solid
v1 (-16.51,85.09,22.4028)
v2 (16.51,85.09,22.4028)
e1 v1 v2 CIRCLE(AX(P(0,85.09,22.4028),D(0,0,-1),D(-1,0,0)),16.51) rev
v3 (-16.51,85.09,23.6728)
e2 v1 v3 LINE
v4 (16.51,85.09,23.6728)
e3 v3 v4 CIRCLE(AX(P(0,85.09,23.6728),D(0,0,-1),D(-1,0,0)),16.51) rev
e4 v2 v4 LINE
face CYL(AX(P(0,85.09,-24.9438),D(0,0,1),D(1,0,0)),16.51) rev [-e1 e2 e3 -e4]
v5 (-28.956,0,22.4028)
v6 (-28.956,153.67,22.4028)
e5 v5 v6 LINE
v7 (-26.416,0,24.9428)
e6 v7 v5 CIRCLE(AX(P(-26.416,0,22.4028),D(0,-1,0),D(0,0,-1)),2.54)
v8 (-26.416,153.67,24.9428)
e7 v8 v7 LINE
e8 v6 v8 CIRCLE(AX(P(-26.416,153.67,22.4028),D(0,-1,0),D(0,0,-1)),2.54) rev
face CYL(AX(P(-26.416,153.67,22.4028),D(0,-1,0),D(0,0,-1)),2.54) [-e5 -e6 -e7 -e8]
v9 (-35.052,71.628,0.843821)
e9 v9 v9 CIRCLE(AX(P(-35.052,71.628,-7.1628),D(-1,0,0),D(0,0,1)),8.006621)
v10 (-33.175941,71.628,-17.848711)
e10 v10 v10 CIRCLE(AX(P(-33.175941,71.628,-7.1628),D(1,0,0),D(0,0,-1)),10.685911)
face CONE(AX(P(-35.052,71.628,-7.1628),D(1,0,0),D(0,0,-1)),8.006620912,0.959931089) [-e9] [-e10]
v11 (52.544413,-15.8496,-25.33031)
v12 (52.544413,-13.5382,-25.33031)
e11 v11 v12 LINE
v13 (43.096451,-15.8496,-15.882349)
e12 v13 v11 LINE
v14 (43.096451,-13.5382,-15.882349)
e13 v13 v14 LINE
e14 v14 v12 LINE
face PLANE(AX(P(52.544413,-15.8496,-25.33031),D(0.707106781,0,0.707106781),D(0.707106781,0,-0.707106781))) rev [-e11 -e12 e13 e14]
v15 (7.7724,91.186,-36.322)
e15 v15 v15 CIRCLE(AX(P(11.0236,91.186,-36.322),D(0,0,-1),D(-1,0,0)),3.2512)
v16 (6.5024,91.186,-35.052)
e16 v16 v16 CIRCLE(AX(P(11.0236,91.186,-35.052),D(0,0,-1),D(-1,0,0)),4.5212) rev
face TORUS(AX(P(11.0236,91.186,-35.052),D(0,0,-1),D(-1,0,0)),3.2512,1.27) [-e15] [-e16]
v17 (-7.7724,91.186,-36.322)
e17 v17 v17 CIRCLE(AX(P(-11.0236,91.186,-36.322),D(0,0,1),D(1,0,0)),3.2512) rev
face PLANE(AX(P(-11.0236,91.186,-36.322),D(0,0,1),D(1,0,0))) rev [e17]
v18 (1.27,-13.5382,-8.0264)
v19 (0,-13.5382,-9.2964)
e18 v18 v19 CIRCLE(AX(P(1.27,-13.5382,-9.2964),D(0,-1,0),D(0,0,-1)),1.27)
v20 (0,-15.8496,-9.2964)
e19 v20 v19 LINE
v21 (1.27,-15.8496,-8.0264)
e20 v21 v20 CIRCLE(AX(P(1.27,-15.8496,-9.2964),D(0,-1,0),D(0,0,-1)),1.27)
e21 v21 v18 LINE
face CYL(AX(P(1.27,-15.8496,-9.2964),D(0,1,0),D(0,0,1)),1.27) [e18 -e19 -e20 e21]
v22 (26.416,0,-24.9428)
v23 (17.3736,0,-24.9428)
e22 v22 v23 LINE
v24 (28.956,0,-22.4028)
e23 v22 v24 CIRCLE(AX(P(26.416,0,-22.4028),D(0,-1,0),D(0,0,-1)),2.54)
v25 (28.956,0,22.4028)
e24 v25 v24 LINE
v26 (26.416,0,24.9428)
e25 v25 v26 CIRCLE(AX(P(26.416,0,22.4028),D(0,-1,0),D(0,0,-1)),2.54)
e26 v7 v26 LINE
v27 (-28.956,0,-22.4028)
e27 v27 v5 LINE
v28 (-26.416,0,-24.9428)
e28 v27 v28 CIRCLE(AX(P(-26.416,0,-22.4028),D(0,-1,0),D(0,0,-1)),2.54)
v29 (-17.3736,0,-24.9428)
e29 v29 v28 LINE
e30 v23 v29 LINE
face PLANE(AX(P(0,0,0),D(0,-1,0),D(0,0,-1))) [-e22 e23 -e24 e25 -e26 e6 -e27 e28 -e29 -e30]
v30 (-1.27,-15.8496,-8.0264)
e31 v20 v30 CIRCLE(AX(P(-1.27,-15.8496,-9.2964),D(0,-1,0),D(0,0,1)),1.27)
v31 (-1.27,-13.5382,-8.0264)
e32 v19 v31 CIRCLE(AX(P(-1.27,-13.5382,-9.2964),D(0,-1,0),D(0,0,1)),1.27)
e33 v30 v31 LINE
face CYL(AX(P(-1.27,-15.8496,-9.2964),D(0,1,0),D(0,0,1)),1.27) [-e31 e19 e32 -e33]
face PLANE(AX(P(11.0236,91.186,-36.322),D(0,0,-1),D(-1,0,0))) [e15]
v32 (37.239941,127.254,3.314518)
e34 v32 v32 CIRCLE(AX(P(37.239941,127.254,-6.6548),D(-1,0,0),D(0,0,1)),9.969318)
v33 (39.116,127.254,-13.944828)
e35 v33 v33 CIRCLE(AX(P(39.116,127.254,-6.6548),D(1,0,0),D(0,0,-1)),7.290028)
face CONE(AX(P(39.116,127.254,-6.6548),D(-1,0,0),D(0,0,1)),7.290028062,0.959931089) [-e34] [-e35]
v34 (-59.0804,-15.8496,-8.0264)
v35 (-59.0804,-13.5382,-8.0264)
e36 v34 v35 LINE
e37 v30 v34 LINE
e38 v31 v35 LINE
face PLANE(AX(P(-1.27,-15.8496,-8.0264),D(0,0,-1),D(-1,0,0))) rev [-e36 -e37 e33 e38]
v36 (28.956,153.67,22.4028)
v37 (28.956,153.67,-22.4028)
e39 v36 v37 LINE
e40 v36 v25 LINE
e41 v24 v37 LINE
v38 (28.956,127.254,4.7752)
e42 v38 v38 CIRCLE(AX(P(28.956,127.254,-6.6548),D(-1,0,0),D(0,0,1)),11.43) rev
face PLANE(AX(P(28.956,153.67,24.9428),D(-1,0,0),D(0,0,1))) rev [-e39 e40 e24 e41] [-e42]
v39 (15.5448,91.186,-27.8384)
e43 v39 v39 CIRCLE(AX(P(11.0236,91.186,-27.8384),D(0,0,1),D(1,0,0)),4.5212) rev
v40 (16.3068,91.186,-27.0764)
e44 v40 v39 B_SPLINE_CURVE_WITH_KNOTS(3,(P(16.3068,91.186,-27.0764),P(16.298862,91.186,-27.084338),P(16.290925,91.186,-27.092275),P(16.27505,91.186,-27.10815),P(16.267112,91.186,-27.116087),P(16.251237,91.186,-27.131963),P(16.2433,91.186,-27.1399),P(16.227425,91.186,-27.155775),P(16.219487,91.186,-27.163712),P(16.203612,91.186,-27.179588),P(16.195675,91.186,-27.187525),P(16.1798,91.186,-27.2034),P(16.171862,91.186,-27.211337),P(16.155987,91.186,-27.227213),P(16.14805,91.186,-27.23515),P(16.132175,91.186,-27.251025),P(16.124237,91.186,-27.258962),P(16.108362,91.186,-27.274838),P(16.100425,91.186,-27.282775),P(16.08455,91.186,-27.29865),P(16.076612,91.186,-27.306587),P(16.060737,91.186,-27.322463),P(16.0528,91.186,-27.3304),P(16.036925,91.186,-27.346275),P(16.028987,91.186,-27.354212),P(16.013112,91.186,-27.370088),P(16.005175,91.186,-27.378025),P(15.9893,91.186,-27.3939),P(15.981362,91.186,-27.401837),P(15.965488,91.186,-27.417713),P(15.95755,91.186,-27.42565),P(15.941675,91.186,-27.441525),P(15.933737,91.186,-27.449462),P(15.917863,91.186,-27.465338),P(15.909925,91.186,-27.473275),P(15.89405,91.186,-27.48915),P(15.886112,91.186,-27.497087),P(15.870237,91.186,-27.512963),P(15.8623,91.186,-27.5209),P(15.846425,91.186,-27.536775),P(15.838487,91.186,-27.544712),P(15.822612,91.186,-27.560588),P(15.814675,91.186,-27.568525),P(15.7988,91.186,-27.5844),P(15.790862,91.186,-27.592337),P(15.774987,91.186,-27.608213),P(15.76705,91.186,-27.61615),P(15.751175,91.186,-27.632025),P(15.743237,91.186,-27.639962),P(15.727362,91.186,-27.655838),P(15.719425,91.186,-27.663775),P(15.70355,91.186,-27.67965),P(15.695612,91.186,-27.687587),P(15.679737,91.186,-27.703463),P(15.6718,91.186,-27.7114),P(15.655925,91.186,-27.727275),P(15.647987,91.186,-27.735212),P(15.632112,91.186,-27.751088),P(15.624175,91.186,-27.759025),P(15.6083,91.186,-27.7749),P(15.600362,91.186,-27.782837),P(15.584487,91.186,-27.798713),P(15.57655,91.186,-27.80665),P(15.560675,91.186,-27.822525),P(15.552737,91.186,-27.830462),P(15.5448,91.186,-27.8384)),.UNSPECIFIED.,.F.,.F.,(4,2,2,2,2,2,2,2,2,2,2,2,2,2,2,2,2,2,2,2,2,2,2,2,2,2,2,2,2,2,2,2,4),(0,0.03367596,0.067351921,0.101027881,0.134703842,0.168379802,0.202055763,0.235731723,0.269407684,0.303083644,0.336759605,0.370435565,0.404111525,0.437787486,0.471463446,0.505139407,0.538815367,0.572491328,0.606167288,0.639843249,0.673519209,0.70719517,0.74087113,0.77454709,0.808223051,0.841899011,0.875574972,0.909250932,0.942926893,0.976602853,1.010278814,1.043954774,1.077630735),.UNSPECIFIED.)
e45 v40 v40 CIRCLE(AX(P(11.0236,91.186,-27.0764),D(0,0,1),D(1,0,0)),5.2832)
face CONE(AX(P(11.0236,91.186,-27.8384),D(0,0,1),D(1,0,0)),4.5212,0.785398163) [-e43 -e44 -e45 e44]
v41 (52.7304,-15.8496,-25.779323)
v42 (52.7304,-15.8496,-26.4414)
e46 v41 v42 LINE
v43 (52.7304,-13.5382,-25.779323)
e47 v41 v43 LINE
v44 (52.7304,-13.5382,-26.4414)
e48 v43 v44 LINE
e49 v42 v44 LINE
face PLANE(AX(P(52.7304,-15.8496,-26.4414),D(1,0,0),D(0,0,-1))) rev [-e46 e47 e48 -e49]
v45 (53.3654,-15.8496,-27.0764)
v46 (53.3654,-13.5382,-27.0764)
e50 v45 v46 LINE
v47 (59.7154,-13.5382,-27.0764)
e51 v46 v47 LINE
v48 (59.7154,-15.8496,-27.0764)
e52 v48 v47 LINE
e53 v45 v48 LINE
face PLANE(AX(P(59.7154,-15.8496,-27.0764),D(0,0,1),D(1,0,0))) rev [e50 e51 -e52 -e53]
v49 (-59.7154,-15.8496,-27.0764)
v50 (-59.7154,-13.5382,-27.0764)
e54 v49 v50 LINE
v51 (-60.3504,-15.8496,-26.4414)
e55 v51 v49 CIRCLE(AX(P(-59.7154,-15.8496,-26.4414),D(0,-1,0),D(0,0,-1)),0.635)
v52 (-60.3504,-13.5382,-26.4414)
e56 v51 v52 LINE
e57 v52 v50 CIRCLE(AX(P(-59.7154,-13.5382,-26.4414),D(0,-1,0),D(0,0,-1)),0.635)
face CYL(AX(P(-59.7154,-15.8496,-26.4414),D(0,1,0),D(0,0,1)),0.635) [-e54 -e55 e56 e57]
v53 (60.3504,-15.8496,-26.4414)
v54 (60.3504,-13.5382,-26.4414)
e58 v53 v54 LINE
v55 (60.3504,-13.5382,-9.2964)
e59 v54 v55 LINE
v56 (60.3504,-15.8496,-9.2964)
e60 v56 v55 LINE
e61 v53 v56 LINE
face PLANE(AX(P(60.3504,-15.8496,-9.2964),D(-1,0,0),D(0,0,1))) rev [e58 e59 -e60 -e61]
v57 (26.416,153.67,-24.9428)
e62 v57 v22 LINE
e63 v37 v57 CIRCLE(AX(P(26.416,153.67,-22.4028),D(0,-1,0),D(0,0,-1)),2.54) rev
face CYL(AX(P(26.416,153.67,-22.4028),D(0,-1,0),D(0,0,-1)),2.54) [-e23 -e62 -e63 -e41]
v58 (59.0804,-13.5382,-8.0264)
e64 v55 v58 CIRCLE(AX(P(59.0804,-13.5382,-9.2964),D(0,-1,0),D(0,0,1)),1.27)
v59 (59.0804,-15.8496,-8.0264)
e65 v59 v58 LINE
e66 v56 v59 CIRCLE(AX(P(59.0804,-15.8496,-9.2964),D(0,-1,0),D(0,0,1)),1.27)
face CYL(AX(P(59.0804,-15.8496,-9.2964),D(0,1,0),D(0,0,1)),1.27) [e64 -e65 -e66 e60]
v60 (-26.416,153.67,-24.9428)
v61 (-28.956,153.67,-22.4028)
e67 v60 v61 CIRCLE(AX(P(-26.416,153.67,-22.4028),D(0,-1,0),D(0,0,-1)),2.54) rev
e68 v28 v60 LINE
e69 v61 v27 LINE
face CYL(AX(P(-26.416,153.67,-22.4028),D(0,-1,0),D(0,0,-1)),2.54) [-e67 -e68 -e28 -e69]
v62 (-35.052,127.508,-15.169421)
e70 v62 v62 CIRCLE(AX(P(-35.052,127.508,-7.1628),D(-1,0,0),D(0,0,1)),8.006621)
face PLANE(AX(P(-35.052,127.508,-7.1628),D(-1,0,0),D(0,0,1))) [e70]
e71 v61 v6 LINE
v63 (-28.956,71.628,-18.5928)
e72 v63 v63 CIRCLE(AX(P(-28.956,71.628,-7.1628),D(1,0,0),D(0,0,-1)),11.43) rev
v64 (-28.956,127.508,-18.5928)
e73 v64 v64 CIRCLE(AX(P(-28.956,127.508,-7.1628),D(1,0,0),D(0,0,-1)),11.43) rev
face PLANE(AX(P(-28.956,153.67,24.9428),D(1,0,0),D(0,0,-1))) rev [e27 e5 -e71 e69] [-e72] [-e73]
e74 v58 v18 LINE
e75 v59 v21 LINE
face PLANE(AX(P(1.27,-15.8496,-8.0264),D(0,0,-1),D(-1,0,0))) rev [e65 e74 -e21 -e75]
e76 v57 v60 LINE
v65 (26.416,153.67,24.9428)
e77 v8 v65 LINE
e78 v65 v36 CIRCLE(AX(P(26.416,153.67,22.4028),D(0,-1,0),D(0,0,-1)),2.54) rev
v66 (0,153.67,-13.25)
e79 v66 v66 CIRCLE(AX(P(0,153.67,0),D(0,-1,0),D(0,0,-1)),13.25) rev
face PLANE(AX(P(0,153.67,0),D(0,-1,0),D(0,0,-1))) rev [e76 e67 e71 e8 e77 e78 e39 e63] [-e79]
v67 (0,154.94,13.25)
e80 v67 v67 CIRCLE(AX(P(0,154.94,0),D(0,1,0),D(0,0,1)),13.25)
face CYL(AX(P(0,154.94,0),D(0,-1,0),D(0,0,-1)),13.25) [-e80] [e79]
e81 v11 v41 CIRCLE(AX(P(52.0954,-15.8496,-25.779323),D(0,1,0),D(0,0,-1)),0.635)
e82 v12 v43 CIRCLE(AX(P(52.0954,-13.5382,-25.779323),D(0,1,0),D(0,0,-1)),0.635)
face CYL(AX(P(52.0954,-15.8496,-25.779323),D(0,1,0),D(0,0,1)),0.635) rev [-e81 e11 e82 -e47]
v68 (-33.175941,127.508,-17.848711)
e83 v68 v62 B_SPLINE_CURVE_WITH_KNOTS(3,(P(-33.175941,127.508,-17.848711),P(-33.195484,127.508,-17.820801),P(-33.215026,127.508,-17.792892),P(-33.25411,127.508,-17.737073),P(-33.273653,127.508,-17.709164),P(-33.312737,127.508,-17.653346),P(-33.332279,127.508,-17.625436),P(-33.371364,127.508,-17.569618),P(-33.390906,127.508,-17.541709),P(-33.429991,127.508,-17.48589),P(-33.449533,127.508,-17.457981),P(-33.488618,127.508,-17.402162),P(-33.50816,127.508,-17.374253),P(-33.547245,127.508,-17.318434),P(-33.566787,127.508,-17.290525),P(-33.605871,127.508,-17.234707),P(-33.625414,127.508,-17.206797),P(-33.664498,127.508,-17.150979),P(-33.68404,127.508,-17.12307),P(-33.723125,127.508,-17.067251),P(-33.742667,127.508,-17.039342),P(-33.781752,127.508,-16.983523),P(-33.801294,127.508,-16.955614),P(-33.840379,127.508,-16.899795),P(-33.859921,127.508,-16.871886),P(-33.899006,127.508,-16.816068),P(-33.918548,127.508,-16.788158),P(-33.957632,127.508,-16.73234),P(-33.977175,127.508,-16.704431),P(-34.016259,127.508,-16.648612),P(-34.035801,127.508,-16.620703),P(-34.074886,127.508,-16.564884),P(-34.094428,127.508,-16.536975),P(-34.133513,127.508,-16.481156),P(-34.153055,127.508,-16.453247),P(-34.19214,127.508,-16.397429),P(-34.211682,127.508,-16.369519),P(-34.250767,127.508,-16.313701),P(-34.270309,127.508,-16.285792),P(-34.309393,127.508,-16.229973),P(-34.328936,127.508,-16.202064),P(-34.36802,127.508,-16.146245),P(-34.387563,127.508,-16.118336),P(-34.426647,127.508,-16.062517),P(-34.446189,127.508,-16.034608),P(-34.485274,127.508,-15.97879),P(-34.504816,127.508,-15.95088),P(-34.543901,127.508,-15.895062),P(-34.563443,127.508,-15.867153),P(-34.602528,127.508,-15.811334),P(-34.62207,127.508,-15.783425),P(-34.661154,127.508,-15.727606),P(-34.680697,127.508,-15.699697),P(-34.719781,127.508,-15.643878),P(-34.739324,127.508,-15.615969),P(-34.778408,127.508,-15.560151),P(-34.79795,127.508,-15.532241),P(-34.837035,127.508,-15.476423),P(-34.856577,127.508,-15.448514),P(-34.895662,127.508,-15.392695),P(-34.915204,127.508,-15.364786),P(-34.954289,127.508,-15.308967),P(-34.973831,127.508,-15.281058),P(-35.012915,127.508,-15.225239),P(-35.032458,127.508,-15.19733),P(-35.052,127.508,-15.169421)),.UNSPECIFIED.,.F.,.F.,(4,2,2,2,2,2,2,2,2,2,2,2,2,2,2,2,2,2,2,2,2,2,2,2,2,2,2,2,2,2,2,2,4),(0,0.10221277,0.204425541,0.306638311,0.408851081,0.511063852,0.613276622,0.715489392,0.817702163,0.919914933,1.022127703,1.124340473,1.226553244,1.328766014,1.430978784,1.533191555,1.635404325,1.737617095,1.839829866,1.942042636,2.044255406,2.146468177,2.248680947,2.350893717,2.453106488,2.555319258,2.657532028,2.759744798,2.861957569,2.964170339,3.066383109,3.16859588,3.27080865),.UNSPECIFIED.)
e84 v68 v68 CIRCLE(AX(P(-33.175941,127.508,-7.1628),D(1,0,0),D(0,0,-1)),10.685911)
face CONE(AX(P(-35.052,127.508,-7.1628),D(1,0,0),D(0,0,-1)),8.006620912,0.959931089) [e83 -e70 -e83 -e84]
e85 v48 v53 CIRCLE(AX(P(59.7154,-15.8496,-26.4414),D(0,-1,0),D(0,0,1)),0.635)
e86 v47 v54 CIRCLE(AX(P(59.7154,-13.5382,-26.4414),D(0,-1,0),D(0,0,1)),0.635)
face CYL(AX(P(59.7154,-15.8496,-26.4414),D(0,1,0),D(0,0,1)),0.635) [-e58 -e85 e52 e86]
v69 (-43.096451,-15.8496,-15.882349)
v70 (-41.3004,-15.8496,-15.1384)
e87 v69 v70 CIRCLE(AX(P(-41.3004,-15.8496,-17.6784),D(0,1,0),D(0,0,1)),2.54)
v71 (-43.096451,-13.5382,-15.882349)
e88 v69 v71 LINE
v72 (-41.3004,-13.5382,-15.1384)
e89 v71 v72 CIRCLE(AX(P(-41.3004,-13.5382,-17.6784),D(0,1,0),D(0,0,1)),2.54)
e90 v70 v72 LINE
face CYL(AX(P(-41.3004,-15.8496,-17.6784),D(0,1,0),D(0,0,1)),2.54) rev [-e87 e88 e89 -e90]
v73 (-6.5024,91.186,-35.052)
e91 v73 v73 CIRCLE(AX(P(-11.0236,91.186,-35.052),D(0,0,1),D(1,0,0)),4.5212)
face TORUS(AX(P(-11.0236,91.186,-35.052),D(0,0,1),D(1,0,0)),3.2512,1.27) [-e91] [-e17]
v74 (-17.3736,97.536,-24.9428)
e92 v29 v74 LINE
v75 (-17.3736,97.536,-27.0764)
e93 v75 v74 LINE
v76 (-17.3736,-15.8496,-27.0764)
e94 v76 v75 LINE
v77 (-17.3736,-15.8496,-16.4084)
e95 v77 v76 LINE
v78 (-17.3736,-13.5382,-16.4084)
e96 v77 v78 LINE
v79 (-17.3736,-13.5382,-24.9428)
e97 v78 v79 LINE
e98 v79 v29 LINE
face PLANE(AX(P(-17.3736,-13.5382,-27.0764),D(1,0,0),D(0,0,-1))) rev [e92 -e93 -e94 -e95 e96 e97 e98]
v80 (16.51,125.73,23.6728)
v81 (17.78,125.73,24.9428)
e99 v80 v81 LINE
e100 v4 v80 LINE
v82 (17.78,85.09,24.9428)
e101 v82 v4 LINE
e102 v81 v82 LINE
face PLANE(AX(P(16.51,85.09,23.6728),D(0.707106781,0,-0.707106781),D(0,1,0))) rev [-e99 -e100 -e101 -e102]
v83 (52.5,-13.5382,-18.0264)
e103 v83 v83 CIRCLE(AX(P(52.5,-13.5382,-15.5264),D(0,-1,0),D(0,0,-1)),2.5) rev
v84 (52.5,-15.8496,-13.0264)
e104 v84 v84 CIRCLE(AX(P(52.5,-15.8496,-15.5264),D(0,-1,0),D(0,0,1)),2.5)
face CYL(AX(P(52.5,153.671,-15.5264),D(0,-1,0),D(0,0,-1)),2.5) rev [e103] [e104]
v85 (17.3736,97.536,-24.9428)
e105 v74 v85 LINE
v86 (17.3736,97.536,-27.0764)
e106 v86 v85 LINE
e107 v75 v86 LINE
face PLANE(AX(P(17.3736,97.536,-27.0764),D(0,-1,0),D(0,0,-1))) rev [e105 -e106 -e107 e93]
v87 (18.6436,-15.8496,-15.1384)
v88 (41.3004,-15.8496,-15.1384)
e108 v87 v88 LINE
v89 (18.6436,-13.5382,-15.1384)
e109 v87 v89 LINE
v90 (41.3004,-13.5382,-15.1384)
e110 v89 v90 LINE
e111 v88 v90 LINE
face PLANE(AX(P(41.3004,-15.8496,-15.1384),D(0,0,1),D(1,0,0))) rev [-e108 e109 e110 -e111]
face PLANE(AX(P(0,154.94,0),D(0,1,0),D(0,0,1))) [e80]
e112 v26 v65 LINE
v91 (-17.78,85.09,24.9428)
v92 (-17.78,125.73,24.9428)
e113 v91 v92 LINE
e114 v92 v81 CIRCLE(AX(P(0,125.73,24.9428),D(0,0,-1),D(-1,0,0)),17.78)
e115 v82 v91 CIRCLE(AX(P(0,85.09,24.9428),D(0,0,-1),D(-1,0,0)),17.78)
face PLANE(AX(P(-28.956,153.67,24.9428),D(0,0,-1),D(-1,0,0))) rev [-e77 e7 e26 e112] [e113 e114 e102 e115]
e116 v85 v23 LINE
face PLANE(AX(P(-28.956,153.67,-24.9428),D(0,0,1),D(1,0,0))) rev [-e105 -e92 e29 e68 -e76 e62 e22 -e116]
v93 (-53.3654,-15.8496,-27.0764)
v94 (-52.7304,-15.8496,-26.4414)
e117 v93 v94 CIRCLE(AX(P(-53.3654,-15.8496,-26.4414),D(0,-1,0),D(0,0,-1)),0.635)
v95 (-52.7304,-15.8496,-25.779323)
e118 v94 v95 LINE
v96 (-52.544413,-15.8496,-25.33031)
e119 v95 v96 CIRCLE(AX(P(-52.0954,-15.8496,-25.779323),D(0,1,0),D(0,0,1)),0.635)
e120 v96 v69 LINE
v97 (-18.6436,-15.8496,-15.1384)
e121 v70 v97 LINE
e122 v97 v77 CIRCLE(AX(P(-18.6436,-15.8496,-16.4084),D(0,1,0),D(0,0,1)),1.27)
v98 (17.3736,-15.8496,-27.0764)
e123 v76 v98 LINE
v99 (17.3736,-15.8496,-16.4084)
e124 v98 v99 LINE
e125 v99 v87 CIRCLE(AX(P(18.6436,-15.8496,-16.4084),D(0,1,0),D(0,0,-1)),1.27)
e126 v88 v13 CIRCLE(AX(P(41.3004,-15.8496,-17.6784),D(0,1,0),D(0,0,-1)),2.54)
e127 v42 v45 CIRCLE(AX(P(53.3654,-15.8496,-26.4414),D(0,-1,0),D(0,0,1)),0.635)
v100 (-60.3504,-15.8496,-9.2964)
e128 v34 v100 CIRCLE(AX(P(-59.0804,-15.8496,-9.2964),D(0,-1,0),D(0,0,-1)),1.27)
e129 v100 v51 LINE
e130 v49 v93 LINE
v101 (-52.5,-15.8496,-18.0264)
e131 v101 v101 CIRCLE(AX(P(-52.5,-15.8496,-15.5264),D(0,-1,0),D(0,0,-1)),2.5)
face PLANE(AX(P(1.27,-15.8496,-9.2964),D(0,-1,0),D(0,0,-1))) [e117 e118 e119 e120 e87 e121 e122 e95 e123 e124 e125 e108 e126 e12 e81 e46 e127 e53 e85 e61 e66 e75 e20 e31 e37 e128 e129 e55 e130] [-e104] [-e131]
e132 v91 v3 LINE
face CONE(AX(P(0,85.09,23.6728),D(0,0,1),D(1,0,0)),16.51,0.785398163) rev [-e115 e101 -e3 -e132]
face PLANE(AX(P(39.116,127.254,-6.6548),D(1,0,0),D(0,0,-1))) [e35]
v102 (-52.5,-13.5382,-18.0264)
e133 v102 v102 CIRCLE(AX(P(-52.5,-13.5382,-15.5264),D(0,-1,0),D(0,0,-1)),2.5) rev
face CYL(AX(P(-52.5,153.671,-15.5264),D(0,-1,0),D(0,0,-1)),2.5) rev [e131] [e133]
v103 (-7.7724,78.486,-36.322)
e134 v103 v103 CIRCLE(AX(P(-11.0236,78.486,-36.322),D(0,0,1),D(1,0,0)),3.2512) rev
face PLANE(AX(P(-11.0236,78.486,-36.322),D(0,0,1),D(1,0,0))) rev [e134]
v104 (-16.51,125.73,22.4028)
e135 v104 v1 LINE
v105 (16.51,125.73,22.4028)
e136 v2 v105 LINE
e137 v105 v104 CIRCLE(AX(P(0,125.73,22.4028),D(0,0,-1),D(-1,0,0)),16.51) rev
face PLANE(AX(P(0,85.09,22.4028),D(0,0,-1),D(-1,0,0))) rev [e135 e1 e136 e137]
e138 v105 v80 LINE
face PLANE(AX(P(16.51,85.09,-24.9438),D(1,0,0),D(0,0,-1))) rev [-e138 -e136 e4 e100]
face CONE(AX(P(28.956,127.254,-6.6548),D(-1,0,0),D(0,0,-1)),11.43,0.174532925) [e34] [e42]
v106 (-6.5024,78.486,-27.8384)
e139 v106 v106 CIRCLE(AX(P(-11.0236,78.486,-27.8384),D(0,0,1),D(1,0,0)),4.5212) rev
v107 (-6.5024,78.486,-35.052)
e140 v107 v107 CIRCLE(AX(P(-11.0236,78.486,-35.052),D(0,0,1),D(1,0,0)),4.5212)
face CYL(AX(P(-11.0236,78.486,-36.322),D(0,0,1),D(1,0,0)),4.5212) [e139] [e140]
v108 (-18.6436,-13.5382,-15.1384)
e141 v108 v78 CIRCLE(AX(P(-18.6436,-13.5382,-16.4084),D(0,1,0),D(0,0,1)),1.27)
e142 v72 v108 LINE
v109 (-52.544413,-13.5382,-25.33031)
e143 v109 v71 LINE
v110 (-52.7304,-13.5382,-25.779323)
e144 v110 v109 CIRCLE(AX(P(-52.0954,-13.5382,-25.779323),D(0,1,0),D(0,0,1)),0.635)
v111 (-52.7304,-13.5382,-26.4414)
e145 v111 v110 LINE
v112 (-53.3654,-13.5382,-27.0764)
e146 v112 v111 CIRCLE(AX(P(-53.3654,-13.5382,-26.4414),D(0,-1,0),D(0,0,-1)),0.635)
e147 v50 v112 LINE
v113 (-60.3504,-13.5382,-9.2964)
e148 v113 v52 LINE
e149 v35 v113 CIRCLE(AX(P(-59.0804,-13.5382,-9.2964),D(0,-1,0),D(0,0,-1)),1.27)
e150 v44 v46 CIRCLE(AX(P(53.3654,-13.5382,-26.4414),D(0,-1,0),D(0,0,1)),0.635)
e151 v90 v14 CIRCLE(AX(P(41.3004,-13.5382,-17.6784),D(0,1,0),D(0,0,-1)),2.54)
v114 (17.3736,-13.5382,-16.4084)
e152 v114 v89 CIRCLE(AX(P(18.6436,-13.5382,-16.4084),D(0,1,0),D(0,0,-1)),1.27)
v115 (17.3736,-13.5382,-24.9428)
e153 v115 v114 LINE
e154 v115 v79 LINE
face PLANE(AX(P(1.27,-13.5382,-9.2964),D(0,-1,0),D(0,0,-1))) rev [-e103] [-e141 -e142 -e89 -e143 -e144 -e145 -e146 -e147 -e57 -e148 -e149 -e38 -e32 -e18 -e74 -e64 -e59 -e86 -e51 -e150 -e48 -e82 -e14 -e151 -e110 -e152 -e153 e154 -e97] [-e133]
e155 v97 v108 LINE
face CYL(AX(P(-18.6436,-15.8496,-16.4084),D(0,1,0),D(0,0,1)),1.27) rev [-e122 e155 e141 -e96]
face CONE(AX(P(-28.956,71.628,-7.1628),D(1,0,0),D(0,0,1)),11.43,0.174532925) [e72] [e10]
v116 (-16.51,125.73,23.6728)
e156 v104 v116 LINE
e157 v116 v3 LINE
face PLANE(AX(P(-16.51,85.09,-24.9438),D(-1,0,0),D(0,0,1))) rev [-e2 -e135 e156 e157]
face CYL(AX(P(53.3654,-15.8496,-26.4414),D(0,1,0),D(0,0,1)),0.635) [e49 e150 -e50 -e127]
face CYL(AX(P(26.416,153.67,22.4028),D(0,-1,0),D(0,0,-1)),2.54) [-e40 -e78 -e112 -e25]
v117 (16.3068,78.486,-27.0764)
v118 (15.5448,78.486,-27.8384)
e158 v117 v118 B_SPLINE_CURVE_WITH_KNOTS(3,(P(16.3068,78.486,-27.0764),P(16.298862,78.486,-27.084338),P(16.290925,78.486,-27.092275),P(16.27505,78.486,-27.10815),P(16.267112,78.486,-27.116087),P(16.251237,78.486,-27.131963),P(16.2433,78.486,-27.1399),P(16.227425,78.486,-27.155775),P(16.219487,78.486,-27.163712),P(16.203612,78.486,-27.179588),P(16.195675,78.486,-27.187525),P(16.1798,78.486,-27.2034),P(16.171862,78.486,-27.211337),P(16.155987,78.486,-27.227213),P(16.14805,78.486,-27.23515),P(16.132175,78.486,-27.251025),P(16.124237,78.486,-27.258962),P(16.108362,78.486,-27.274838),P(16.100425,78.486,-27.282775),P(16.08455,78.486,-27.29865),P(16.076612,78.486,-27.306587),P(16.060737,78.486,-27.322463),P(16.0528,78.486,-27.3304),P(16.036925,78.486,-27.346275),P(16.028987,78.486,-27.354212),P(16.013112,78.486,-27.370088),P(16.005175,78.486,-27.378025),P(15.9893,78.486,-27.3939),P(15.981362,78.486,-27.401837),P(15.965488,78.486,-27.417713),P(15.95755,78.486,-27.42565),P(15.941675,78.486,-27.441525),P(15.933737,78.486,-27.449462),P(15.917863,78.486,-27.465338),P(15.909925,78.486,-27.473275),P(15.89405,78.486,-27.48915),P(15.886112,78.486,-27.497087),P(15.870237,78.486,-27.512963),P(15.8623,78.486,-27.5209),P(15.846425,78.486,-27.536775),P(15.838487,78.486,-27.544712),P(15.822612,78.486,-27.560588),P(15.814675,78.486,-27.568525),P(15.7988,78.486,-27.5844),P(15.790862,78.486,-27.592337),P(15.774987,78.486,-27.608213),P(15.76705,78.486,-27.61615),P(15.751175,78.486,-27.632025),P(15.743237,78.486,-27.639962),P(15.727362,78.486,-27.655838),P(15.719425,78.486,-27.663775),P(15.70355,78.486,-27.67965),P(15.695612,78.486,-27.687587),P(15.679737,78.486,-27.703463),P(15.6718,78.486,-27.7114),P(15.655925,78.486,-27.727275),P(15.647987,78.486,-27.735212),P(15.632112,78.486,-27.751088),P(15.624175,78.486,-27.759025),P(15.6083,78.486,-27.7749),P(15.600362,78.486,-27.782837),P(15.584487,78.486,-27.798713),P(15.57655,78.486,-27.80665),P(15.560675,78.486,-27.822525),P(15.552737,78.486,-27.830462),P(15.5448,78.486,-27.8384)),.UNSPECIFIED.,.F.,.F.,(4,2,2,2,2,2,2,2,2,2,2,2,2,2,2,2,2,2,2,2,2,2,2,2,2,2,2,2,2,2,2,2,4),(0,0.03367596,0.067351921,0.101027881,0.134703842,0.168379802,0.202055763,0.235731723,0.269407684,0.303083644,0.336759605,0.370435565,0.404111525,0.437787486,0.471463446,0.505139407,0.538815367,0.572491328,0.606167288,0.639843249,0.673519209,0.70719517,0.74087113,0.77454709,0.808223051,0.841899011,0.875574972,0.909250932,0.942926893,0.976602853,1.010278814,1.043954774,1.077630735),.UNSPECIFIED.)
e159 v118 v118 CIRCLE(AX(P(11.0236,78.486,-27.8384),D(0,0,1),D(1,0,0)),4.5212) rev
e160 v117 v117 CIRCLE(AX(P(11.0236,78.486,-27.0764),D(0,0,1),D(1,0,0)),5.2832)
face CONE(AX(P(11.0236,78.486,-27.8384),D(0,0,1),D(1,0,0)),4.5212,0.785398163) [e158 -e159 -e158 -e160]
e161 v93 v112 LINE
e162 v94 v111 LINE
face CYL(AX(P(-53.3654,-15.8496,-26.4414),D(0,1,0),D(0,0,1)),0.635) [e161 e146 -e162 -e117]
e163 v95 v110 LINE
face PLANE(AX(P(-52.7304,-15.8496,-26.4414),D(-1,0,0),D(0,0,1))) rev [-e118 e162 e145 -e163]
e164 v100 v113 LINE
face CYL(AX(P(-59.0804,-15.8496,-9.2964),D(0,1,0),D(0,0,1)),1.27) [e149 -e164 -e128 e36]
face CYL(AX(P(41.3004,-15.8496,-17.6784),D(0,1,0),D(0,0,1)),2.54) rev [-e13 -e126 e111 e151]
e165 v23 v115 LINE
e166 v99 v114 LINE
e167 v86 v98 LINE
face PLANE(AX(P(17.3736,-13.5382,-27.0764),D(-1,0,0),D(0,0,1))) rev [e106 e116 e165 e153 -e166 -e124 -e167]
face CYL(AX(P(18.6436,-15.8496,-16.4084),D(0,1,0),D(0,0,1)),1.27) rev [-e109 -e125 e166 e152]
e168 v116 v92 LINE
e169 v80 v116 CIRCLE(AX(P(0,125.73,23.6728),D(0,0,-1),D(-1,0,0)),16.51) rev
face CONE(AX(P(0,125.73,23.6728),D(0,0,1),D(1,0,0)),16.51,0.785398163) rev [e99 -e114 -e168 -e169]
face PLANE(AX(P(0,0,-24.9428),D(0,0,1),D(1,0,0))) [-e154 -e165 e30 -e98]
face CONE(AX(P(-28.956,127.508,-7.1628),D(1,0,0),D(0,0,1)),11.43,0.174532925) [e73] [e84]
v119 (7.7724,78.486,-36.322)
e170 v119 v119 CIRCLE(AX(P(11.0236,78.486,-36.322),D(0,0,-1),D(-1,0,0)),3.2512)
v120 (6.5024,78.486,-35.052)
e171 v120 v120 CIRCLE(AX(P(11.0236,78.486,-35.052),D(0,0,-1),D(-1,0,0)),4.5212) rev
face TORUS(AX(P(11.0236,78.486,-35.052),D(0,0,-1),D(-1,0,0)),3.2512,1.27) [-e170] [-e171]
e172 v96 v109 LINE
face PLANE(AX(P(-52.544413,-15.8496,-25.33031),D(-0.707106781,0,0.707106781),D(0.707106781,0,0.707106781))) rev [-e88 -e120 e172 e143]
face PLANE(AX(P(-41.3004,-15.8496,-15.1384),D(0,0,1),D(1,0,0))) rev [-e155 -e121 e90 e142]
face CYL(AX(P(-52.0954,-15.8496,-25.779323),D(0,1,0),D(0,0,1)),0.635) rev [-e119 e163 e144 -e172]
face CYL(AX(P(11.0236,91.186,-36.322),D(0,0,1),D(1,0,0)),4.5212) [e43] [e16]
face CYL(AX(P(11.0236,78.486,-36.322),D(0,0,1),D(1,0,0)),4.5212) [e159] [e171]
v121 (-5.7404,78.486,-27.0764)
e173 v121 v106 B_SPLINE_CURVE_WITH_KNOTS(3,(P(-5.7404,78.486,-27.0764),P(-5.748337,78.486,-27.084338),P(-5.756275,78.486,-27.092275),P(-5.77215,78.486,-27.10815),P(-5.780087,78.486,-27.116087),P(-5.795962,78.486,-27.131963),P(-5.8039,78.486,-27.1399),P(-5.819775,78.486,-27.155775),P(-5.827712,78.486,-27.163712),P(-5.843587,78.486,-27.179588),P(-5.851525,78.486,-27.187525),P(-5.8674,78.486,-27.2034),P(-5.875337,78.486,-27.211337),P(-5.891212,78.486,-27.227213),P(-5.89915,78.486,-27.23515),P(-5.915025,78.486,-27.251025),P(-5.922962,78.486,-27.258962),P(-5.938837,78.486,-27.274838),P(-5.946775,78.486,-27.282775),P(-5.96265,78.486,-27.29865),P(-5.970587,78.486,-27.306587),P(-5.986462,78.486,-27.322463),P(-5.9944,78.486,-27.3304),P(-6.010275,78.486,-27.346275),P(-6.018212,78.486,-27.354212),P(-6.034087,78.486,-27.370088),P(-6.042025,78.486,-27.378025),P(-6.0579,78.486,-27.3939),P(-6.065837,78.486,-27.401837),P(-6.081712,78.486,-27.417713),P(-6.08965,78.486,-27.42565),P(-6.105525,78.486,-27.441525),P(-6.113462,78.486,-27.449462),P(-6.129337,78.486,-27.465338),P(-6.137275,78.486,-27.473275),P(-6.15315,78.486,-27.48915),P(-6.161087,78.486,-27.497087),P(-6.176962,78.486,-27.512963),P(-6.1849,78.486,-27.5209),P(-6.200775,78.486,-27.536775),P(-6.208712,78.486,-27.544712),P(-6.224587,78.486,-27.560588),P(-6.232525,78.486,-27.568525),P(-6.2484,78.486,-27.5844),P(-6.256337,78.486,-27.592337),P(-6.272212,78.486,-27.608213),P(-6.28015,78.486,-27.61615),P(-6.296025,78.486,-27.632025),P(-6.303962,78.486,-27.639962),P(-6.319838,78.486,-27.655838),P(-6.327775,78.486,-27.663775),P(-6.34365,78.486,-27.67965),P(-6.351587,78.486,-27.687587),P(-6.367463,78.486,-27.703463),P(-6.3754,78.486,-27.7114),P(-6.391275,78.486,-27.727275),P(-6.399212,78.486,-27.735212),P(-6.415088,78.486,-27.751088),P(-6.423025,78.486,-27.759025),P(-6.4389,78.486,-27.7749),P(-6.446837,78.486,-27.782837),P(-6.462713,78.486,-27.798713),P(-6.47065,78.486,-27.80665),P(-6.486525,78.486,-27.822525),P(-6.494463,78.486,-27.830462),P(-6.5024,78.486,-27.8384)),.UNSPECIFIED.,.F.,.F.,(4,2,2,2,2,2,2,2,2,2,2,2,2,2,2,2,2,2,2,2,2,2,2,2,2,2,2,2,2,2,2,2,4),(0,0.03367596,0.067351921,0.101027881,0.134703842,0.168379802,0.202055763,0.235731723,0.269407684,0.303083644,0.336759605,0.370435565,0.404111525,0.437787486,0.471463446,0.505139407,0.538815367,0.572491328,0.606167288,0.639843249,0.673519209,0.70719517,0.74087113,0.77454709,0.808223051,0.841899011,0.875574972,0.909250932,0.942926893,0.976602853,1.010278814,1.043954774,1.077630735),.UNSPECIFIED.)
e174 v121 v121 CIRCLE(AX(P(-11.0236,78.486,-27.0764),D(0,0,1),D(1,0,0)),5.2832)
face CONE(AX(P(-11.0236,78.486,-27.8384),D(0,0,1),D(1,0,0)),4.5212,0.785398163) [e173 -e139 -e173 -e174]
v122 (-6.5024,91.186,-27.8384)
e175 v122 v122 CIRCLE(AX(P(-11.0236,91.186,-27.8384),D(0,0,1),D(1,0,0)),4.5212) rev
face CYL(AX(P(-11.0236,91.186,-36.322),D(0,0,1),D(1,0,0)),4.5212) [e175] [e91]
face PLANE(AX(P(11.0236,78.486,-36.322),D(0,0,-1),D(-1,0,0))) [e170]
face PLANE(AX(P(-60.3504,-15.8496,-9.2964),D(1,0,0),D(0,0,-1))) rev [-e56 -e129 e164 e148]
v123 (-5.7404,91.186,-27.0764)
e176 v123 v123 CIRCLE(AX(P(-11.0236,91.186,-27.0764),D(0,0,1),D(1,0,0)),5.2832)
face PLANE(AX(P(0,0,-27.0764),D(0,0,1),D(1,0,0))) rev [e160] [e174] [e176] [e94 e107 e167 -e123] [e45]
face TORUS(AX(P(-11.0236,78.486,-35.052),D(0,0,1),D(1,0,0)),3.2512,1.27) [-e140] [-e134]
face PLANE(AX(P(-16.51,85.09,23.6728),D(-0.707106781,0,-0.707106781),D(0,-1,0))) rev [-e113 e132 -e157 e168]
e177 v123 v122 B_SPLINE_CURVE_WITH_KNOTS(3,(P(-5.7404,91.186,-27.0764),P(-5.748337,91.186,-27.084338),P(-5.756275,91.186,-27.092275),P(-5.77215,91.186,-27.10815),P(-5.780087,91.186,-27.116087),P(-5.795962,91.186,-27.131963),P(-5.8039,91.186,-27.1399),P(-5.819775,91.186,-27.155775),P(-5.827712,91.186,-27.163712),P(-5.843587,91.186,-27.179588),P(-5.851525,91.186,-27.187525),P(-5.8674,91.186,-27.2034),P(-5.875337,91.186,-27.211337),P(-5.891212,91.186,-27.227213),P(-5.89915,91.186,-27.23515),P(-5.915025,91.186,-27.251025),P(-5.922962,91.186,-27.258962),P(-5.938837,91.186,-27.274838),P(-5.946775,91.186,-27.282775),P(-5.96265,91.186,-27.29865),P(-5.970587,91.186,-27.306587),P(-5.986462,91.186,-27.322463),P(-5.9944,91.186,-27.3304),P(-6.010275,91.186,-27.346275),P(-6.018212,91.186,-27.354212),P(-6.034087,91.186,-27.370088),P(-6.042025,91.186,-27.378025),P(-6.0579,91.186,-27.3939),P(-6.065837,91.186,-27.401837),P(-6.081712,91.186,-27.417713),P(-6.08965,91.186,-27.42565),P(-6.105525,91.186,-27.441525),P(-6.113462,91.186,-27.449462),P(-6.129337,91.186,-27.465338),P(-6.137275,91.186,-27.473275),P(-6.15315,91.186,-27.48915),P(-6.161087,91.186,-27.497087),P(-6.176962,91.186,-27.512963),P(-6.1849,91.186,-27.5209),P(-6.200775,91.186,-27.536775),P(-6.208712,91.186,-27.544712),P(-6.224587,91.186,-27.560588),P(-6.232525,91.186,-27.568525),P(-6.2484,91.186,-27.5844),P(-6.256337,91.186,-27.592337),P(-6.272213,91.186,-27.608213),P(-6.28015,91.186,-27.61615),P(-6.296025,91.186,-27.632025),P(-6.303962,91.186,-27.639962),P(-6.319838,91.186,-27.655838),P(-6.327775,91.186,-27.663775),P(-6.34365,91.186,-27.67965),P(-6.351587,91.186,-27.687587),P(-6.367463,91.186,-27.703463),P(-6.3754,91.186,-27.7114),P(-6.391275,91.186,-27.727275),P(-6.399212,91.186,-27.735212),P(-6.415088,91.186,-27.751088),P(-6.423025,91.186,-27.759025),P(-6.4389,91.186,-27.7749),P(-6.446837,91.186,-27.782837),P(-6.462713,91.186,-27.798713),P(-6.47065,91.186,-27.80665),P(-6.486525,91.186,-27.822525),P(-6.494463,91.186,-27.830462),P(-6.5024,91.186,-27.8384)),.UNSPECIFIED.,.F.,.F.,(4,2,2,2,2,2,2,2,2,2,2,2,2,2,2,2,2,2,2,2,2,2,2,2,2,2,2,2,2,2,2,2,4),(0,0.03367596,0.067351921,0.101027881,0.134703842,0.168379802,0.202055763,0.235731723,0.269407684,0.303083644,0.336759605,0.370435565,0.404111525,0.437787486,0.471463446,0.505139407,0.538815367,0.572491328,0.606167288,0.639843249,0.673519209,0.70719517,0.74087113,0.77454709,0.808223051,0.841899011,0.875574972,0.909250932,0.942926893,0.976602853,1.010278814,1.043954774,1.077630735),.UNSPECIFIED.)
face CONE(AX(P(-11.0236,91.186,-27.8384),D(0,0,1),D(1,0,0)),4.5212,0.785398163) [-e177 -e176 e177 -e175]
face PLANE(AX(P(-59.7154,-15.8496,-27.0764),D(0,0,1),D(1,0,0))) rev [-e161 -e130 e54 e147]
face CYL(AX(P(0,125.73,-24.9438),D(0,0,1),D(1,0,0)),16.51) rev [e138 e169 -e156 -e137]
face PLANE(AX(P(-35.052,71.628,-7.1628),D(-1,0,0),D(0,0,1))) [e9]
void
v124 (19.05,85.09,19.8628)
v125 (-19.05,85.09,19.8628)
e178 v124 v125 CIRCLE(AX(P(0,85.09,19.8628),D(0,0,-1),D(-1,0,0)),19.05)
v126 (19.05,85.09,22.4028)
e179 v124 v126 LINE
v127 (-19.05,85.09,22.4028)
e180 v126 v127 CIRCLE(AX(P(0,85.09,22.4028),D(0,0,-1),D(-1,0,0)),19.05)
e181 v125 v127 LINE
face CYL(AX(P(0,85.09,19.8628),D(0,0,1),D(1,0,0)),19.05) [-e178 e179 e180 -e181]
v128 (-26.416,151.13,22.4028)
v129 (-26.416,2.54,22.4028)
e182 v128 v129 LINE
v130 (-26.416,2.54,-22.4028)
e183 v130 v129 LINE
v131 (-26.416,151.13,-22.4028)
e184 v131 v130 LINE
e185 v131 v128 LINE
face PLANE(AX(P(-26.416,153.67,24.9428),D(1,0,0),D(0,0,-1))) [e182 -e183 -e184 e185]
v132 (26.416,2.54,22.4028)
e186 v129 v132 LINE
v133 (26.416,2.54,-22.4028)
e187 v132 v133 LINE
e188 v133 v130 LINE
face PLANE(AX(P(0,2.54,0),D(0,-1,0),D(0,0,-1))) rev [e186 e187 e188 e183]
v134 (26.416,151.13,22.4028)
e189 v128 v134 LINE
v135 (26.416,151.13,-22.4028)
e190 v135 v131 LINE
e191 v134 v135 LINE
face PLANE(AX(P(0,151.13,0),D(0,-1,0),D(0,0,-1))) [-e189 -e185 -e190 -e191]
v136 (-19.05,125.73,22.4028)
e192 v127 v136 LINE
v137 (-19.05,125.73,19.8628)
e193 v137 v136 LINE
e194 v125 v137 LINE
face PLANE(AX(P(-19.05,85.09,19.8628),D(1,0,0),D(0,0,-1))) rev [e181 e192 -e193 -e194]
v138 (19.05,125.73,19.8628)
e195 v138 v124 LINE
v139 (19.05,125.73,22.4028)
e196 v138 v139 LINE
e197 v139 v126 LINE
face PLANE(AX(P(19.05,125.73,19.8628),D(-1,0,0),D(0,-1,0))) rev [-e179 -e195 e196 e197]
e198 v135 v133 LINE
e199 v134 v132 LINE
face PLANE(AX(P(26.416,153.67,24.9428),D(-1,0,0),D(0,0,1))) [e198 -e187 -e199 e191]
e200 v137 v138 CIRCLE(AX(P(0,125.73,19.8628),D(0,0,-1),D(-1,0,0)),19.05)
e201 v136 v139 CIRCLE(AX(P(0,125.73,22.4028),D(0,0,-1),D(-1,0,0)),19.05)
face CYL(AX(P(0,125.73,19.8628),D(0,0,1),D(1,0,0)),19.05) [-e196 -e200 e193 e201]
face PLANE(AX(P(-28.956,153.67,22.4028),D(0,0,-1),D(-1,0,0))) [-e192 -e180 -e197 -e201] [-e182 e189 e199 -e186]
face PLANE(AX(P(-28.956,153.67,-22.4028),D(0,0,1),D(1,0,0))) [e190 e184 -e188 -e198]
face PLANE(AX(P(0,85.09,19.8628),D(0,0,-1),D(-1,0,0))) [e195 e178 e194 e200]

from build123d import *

# Parameters (mm, degrees)
SKETCH1_W                     = 57.912
SKETCH1_H                     = 49.8856
BOSS_EXTRUDE1_DEPTH           = 153.67
SHELL2_T                      = -2.54
SKETCH2_W                     = 52.832
SKETCH2_H                     = 44.8056
BOSS_EXTRUDE2_DEPTH           = 2.54
CUT_EXTRUDE1_REACH            = 166.139
BOSS_EXTRUDE3_DEPTH           = 2.54
SKETCH5_W                     = 34.7472
SKETCH5_H                     = 111.0742
BOSS_EXTRUDE4_DEPTH           = 2.1336
SKETCH6_R                     = 4.5212
BOSS_EXTRUDE5_DEPTH           = 9.2456
FILLET1_R                     = 1.27
CHAMFER1_SIZE                 = 0.762
FILLET2_R                     = 2.54
BOSS_EXTRUDE6_DEPTH           = 2.3114
CUT_EXTRUDE2_REACH            = 185.571
SKETCH8_R                     = 2.5
SKETCH9_R                     = 13.25
BOSS_EXTRUDE7_DEPTH           = 1.27
SKETCH10_R                    = 11.43
BOSS_EXTRUDE8_DEPTH           = 10.16
BOSS_EXTRUDE8_TAPER           = 10
SKETCH11_R                    = 11.43
BOSS_EXTRUDE9_DEPTH           = 6.096
BOSS_EXTRUDE9_DRAFT           = 10
BOSS_EXTRUDE9_PROFILE_2_DEPTH = 6.096
BOSS_EXTRUDE9_PROFILE_2_DRAFT = 10
CHAMFER2_SIZE                 = 1.905
CHAMFER2_SIZE_2               = 2.348489814
CHAMFER3_SIZE                 = 1.27


with BuildPart() as part:
    # Sketch1 → Boss-Extrude1 (new body)
    with BuildSketch(Plane(origin=(0, 0, 0), x_dir=(1, 0, 0), z_dir=(0, 1, 0))):
        Rectangle(SKETCH1_W, SKETCH1_H)
    extrude(amount=BOSS_EXTRUDE1_DEPTH)

    # Shell2
    shell2_openings = [part.faces().sort_by_distance(p)[0] for p in [
        (0, 153.67, 0),
    ]]
    offset(amount=SHELL2_T, openings=shell2_openings, kind=Kind.INTERSECTION)

    # Sketch2 → Boss-Extrude2 (add)
    with BuildSketch(Plane(origin=(0, 153.67, 0), x_dir=(1, 0, 0), z_dir=(0, 1, 0))):
        Rectangle(SKETCH2_W, SKETCH2_H)
    extrude(amount=-BOSS_EXTRUDE2_DEPTH)

    # Sketch3 → Cut-Extrude1 (cut, up to next)
    with BuildSketch(Plane.XY.offset(24.9428), mode=Mode.PRIVATE) as cut_extrude1_sk1:
        with BuildLine():
            Line((-16.51, 85.09), (-16.51, 125.73))
            ThreePointArc((-16.51, 125.73), (0, 142.24), (16.51, 125.73))
            Line((16.51, 125.73), (16.51, 85.09))
            ThreePointArc((16.51, 85.09), (0, 68.58), (-16.51, 85.09))
        make_face()
    cut_extrude1_tool1 = extrude(cut_extrude1_sk1.sketch, amount=-CUT_EXTRUDE1_REACH, mode=Mode.PRIVATE) & part.part
    add(cut_extrude1_tool1.solids().sort_by_distance((0, 105.41, 24.9428))[0], mode=Mode.SUBTRACT)

    # Sketch4 → Boss-Extrude3 (add)
    with BuildSketch(Plane(origin=(0, 0, 22.4028), x_dir=(-1, 0, 0), z_dir=(0, 0, -1))):
        with BuildLine():
            Line((19.05, 85.09), (19.05, 125.73))
            ThreePointArc((19.05, 125.73), (0, 144.78), (-19.05, 125.73))
            Line((-19.05, 125.73), (-19.05, 85.09))
            ThreePointArc((-19.05, 85.09), (0, 66.04), (19.05, 85.09))
        make_face()
    extrude(amount=BOSS_EXTRUDE3_DEPTH)

    # Sketch5 → Boss-Extrude4 (add)
    with BuildSketch(Plane(origin=(0, 0, -24.9428), x_dir=(-1, 0, 0), z_dir=(0, 0, -1))):
        with Locations((0, 41.9989)):
            Rectangle(SKETCH5_W, SKETCH5_H)
    extrude(amount=BOSS_EXTRUDE4_DEPTH)

    # Sketch6 → Boss-Extrude5 (add)
    with BuildSketch(Plane(origin=(0, 0, -27.0764), x_dir=(-1, 0, 0), z_dir=(0, 0, -1))):
        with Locations(Location((-11.0236, 91.186, 0), (0, 0, 180))):
            Circle(SKETCH6_R)
        with Locations(Location((-11.0236, 78.486, 0), (0, 0, 180))):
            Circle(SKETCH6_R)
        with Locations(Location((11.0236, 91.186, 0), (0, 0, 180))):
            Circle(SKETCH6_R)
        with Locations(Location((11.0236, 78.486, 0), (0, 0, 180))):
            Circle(SKETCH6_R)
    extrude(amount=BOSS_EXTRUDE5_DEPTH)

    # Fillet1
    fillet1_edges = [part.edges().sort_by_distance(p)[0] for p in [
        (6.5024, 91.186, -36.322),
        (6.5024, 78.486, -36.322),
        (-15.5448, 91.186, -36.322),
        (-15.5448, 78.486, -36.322),
    ]]
    fillet(fillet1_edges, radius=FILLET1_R)

    # Chamfer1
    chamfer1_edges = [part.edges().sort_by_distance(p)[0] for p in [
        (6.5024, 91.186, -27.0764),
        (6.5024, 78.486, -27.0764),
        (-15.5448, 91.186, -27.0764),
        (-15.5448, 78.486, -27.0764),
    ]]
    chamfer(chamfer1_edges, length=CHAMFER1_SIZE)

    # Fillet2
    fillet2_edges = [part.edges().sort_by_distance(p)[0] for p in [
        (28.956, 76.835, 24.9428),
        (-28.956, 76.835, 24.9428),
        (-28.956, 76.835, -24.9428),
        (28.956, 76.835, -24.9428),
    ]]
    fillet(fillet2_edges, radius=FILLET2_R)

    # Sketch7 → Boss-Extrude6 (add)
    with BuildSketch(Plane.XZ.offset(13.5382)):
        with BuildLine():
            Line((1.27, -8.0264), (59.0804, -8.0264))
            ThreePointArc((59.0804, -8.0264), (59.978425612, -8.398374388), (60.3504, -9.2964))
            Line((60.3504, -9.2964), (60.3504, -26.4414))
            ThreePointArc((60.3504, -26.4414), (60.164412806, -26.890412806), (59.7154, -27.0764))
            Line((59.7154, -27.0764), (53.3654, -27.0764))
            ThreePointArc((53.3654, -27.0764), (52.916387194, -26.890412806), (52.7304, -26.4414))
            Line((52.7304, -26.4414), (52.7304, -25.779323164))
            ThreePointArc((52.7304, -25.779323164), (52.682063503, -25.536319184), (52.544412806, -25.330310358))
            Line((52.544412806, -25.330310358), (43.096451224, -15.882348776))
            ThreePointArc((43.096451224, -15.882348776), (42.272415918, -15.331745987), (41.3004, -15.1384))
            Line((41.3004, -15.1384), (18.6436, -15.1384))
            ThreePointArc((18.6436, -15.1384), (17.745574388, -15.510374388), (17.3736, -16.4084))
            Line((17.3736, -16.4084), (17.3736, -27.0764))
            Line((17.3736, -27.0764), (-17.3736, -27.0764))
            Line((-17.3736, -27.0764), (-17.3736, -16.4084))
            ThreePointArc((-17.3736, -16.4084), (-17.745574388, -15.510374388), (-18.6436, -15.1384))
            Line((-18.6436, -15.1384), (-41.3004, -15.1384))
            ThreePointArc((-41.3004, -15.1384), (-42.272415918, -15.331745987), (-43.096451224, -15.882348776))
            Line((-43.096451224, -15.882348776), (-52.544412806, -25.330310358))
            ThreePointArc((-52.544412806, -25.330310358), (-52.682063503, -25.536319184), (-52.7304, -25.779323164))
            Line((-52.7304, -25.779323164), (-52.7304, -26.4414))
            ThreePointArc((-52.7304, -26.4414), (-52.916387194, -26.890412806), (-53.3654, -27.0764))
            Line((-53.3654, -27.0764), (-59.7154, -27.0764))
            ThreePointArc((-59.7154, -27.0764), (-60.164412806, -26.890412806), (-60.3504, -26.4414))
            Line((-60.3504, -26.4414), (-60.3504, -9.2964))
            ThreePointArc((-60.3504, -9.2964), (-59.978425612, -8.398374388), (-59.0804, -8.0264))
            Line((-59.0804, -8.0264), (-1.27, -8.0264))
            ThreePointArc((-1.27, -8.0264), (-0.371974388, -8.398374388), (0, -9.2964))
            ThreePointArc((0, -9.2964), (0.371974388, -8.398374388), (1.27, -8.0264))
        make_face()
    extrude(amount=BOSS_EXTRUDE6_DEPTH)

    # Sketch8 → Cut-Extrude2 (cut, up to next)
    with BuildSketch(Plane.XZ.offset(15.8496), mode=Mode.PRIVATE) as cut_extrude2_sk1:
        with Locations(Location((-52.5, -15.5264, 0), (0, 0, 270))):
            Circle(SKETCH8_R)
    cut_extrude2_tool1 = extrude(cut_extrude2_sk1.sketch, amount=-CUT_EXTRUDE2_REACH, mode=Mode.PRIVATE) & part.part
    # Sketch8 → Cut-Extrude2 (cut, up to next)
    with BuildSketch(Plane.XZ.offset(15.8496), mode=Mode.PRIVATE) as cut_extrude2_sk2:
        with Locations(Location((52.5, -15.5264, 0), (0, 0, 270))):
            Circle(SKETCH8_R)
    cut_extrude2_tool2 = extrude(cut_extrude2_sk2.sketch, amount=-CUT_EXTRUDE2_REACH, mode=Mode.PRIVATE) & part.part
    add(cut_extrude2_tool1.solids().sort_by_distance((-52.5, -15.8496, -15.5264))[0], mode=Mode.SUBTRACT)
    add(cut_extrude2_tool2.solids().sort_by_distance((52.5, -15.8496, -15.5264))[0], mode=Mode.SUBTRACT)

    # Sketch9 → Boss-Extrude7 (add)
    with BuildSketch(Plane(origin=(0, 153.67, 0), x_dir=(1, 0, 0), z_dir=(0, 1, 0))):
        with Locations(Location((0, 0, 0), (0, 0, 90))):
            Circle(SKETCH9_R)
    extrude(amount=BOSS_EXTRUDE7_DEPTH)

    # Sketch10 → Boss-Extrude8 (add)
    with BuildSketch(Plane(origin=(28.956, 0, 0), x_dir=(0, 0, -1), z_dir=(1, 0, 0))):
        with Locations((6.6548, 127.254)):
            Circle(SKETCH10_R)
    extrude(amount=BOSS_EXTRUDE8_DEPTH, taper=BOSS_EXTRUDE8_TAPER)


with BuildPart() as boss_extrude9_tool:
    # Sketch11 → Boss-Extrude9 (with draft: the straight prism first)
    with BuildSketch(Plane.ZY.offset(28.956)):
        with Locations((-7.1628, 127.508)):
            Circle(SKETCH11_R)
    extrude(amount=BOSS_EXTRUDE9_DEPTH)
    # Boss-Extrude9: the draft: its side faces are tilted about the plane it starts from
    boss_extrude9_sides = [boss_extrude9_tool.faces().sort_by_distance(p)[0] for p in [
        (-32.004, 127.508, -18.5928),
    ]]
    draft(boss_extrude9_sides, Plane.ZY.offset(28.956), BOSS_EXTRUDE9_DRAFT)


with BuildPart() as part_1:
    add(part.part)

    # Boss-Extrude9: add boss_extrude9_tool
    add(boss_extrude9_tool.part)


with BuildPart() as boss_extrude9_profile_2_tool:
    # Sketch11 → Boss-Extrude9 profile 2 (with draft: the straight prism first)
    with BuildSketch(Plane.ZY.offset(28.956)):
        with Locations((-7.1628, 71.628)):
            Circle(SKETCH11_R)
    extrude(amount=BOSS_EXTRUDE9_PROFILE_2_DEPTH)
    # Boss-Extrude9 profile 2: the draft: its side faces are tilted about the plane it starts from
    boss_extrude9_profile_2_sides = [boss_extrude9_profile_2_tool.faces().sort_by_distance(p)[0] for p in [
        (-32.004, 71.628, -18.5928),
    ]]
    draft(boss_extrude9_profile_2_sides, Plane.ZY.offset(28.956), BOSS_EXTRUDE9_PROFILE_2_DRAFT)


with BuildPart() as part_2:
    add(part_1.part)

    # Boss-Extrude9 profile 2: add boss_extrude9_profile_2_tool
    add(boss_extrude9_profile_2_tool.part)

    # Chamfer2
    # the kernel refuses this chamfer: 2.348489814, 1.905 mm, written as the material it takes off along each edge
    with BuildSketch(Plane(origin=(39.116, 127.254, -6.6548), x_dir=(0, 0, -1), z_dir=(0, 1, 0))) as chamfer2_piece_1:
        Polygon((9.638517876 + CHAMFER2_SIZE * 0.173648177667, CHAMFER2_SIZE * 0.984807753012), (9.638517876 - CHAMFER2_SIZE_2, 0), (9.638517876, 0), align=None)
    revolve(axis=Axis((39.116, 127.254, -6.6548), (-1, 0, 0)), mode=Mode.SUBTRACT)
    with BuildSketch(Plane(origin=(-35.052, 127.508, -7.1628), x_dir=(0, 0, 1), z_dir=(0, -1, 0))) as chamfer2_piece_2:
        Polygon((10.355110726 + CHAMFER2_SIZE * 0.173648177667, -CHAMFER2_SIZE * 0.984807753012), (10.355110726 - CHAMFER2_SIZE_2, 0), (10.355110726, 0), align=None)
    revolve(axis=Axis((-35.052, 127.508, -7.1628), (-1, 0, 0)), mode=Mode.SUBTRACT)
    with BuildSketch(Plane(origin=(-35.052, 71.628, -7.1628), x_dir=(0, 0, 1), z_dir=(0, -1, 0))) as chamfer2_piece_3:
        Polygon((10.355110726 + CHAMFER2_SIZE * 0.173648177667, -CHAMFER2_SIZE * 0.984807753012), (10.355110726 - CHAMFER2_SIZE_2, 0), (10.355110726, 0), align=None)
    revolve(axis=Axis((-35.052, 71.628, -7.1628), (-1, 0, 0)), mode=Mode.SUBTRACT)

    # Chamfer3
    chamfer3_edges = [part_2.edges().sort_by_distance(p)[0] for p in [
        (0, 68.58, 24.9428),
        (16.51, 105.41, 24.9428),
        (0, 142.24, 24.9428),
        (-16.51, 105.41, 24.9428),
    ]]
    chamfer(chamfer3_edges, length=CHAMFER3_SIZE)


solid = part_2.part
